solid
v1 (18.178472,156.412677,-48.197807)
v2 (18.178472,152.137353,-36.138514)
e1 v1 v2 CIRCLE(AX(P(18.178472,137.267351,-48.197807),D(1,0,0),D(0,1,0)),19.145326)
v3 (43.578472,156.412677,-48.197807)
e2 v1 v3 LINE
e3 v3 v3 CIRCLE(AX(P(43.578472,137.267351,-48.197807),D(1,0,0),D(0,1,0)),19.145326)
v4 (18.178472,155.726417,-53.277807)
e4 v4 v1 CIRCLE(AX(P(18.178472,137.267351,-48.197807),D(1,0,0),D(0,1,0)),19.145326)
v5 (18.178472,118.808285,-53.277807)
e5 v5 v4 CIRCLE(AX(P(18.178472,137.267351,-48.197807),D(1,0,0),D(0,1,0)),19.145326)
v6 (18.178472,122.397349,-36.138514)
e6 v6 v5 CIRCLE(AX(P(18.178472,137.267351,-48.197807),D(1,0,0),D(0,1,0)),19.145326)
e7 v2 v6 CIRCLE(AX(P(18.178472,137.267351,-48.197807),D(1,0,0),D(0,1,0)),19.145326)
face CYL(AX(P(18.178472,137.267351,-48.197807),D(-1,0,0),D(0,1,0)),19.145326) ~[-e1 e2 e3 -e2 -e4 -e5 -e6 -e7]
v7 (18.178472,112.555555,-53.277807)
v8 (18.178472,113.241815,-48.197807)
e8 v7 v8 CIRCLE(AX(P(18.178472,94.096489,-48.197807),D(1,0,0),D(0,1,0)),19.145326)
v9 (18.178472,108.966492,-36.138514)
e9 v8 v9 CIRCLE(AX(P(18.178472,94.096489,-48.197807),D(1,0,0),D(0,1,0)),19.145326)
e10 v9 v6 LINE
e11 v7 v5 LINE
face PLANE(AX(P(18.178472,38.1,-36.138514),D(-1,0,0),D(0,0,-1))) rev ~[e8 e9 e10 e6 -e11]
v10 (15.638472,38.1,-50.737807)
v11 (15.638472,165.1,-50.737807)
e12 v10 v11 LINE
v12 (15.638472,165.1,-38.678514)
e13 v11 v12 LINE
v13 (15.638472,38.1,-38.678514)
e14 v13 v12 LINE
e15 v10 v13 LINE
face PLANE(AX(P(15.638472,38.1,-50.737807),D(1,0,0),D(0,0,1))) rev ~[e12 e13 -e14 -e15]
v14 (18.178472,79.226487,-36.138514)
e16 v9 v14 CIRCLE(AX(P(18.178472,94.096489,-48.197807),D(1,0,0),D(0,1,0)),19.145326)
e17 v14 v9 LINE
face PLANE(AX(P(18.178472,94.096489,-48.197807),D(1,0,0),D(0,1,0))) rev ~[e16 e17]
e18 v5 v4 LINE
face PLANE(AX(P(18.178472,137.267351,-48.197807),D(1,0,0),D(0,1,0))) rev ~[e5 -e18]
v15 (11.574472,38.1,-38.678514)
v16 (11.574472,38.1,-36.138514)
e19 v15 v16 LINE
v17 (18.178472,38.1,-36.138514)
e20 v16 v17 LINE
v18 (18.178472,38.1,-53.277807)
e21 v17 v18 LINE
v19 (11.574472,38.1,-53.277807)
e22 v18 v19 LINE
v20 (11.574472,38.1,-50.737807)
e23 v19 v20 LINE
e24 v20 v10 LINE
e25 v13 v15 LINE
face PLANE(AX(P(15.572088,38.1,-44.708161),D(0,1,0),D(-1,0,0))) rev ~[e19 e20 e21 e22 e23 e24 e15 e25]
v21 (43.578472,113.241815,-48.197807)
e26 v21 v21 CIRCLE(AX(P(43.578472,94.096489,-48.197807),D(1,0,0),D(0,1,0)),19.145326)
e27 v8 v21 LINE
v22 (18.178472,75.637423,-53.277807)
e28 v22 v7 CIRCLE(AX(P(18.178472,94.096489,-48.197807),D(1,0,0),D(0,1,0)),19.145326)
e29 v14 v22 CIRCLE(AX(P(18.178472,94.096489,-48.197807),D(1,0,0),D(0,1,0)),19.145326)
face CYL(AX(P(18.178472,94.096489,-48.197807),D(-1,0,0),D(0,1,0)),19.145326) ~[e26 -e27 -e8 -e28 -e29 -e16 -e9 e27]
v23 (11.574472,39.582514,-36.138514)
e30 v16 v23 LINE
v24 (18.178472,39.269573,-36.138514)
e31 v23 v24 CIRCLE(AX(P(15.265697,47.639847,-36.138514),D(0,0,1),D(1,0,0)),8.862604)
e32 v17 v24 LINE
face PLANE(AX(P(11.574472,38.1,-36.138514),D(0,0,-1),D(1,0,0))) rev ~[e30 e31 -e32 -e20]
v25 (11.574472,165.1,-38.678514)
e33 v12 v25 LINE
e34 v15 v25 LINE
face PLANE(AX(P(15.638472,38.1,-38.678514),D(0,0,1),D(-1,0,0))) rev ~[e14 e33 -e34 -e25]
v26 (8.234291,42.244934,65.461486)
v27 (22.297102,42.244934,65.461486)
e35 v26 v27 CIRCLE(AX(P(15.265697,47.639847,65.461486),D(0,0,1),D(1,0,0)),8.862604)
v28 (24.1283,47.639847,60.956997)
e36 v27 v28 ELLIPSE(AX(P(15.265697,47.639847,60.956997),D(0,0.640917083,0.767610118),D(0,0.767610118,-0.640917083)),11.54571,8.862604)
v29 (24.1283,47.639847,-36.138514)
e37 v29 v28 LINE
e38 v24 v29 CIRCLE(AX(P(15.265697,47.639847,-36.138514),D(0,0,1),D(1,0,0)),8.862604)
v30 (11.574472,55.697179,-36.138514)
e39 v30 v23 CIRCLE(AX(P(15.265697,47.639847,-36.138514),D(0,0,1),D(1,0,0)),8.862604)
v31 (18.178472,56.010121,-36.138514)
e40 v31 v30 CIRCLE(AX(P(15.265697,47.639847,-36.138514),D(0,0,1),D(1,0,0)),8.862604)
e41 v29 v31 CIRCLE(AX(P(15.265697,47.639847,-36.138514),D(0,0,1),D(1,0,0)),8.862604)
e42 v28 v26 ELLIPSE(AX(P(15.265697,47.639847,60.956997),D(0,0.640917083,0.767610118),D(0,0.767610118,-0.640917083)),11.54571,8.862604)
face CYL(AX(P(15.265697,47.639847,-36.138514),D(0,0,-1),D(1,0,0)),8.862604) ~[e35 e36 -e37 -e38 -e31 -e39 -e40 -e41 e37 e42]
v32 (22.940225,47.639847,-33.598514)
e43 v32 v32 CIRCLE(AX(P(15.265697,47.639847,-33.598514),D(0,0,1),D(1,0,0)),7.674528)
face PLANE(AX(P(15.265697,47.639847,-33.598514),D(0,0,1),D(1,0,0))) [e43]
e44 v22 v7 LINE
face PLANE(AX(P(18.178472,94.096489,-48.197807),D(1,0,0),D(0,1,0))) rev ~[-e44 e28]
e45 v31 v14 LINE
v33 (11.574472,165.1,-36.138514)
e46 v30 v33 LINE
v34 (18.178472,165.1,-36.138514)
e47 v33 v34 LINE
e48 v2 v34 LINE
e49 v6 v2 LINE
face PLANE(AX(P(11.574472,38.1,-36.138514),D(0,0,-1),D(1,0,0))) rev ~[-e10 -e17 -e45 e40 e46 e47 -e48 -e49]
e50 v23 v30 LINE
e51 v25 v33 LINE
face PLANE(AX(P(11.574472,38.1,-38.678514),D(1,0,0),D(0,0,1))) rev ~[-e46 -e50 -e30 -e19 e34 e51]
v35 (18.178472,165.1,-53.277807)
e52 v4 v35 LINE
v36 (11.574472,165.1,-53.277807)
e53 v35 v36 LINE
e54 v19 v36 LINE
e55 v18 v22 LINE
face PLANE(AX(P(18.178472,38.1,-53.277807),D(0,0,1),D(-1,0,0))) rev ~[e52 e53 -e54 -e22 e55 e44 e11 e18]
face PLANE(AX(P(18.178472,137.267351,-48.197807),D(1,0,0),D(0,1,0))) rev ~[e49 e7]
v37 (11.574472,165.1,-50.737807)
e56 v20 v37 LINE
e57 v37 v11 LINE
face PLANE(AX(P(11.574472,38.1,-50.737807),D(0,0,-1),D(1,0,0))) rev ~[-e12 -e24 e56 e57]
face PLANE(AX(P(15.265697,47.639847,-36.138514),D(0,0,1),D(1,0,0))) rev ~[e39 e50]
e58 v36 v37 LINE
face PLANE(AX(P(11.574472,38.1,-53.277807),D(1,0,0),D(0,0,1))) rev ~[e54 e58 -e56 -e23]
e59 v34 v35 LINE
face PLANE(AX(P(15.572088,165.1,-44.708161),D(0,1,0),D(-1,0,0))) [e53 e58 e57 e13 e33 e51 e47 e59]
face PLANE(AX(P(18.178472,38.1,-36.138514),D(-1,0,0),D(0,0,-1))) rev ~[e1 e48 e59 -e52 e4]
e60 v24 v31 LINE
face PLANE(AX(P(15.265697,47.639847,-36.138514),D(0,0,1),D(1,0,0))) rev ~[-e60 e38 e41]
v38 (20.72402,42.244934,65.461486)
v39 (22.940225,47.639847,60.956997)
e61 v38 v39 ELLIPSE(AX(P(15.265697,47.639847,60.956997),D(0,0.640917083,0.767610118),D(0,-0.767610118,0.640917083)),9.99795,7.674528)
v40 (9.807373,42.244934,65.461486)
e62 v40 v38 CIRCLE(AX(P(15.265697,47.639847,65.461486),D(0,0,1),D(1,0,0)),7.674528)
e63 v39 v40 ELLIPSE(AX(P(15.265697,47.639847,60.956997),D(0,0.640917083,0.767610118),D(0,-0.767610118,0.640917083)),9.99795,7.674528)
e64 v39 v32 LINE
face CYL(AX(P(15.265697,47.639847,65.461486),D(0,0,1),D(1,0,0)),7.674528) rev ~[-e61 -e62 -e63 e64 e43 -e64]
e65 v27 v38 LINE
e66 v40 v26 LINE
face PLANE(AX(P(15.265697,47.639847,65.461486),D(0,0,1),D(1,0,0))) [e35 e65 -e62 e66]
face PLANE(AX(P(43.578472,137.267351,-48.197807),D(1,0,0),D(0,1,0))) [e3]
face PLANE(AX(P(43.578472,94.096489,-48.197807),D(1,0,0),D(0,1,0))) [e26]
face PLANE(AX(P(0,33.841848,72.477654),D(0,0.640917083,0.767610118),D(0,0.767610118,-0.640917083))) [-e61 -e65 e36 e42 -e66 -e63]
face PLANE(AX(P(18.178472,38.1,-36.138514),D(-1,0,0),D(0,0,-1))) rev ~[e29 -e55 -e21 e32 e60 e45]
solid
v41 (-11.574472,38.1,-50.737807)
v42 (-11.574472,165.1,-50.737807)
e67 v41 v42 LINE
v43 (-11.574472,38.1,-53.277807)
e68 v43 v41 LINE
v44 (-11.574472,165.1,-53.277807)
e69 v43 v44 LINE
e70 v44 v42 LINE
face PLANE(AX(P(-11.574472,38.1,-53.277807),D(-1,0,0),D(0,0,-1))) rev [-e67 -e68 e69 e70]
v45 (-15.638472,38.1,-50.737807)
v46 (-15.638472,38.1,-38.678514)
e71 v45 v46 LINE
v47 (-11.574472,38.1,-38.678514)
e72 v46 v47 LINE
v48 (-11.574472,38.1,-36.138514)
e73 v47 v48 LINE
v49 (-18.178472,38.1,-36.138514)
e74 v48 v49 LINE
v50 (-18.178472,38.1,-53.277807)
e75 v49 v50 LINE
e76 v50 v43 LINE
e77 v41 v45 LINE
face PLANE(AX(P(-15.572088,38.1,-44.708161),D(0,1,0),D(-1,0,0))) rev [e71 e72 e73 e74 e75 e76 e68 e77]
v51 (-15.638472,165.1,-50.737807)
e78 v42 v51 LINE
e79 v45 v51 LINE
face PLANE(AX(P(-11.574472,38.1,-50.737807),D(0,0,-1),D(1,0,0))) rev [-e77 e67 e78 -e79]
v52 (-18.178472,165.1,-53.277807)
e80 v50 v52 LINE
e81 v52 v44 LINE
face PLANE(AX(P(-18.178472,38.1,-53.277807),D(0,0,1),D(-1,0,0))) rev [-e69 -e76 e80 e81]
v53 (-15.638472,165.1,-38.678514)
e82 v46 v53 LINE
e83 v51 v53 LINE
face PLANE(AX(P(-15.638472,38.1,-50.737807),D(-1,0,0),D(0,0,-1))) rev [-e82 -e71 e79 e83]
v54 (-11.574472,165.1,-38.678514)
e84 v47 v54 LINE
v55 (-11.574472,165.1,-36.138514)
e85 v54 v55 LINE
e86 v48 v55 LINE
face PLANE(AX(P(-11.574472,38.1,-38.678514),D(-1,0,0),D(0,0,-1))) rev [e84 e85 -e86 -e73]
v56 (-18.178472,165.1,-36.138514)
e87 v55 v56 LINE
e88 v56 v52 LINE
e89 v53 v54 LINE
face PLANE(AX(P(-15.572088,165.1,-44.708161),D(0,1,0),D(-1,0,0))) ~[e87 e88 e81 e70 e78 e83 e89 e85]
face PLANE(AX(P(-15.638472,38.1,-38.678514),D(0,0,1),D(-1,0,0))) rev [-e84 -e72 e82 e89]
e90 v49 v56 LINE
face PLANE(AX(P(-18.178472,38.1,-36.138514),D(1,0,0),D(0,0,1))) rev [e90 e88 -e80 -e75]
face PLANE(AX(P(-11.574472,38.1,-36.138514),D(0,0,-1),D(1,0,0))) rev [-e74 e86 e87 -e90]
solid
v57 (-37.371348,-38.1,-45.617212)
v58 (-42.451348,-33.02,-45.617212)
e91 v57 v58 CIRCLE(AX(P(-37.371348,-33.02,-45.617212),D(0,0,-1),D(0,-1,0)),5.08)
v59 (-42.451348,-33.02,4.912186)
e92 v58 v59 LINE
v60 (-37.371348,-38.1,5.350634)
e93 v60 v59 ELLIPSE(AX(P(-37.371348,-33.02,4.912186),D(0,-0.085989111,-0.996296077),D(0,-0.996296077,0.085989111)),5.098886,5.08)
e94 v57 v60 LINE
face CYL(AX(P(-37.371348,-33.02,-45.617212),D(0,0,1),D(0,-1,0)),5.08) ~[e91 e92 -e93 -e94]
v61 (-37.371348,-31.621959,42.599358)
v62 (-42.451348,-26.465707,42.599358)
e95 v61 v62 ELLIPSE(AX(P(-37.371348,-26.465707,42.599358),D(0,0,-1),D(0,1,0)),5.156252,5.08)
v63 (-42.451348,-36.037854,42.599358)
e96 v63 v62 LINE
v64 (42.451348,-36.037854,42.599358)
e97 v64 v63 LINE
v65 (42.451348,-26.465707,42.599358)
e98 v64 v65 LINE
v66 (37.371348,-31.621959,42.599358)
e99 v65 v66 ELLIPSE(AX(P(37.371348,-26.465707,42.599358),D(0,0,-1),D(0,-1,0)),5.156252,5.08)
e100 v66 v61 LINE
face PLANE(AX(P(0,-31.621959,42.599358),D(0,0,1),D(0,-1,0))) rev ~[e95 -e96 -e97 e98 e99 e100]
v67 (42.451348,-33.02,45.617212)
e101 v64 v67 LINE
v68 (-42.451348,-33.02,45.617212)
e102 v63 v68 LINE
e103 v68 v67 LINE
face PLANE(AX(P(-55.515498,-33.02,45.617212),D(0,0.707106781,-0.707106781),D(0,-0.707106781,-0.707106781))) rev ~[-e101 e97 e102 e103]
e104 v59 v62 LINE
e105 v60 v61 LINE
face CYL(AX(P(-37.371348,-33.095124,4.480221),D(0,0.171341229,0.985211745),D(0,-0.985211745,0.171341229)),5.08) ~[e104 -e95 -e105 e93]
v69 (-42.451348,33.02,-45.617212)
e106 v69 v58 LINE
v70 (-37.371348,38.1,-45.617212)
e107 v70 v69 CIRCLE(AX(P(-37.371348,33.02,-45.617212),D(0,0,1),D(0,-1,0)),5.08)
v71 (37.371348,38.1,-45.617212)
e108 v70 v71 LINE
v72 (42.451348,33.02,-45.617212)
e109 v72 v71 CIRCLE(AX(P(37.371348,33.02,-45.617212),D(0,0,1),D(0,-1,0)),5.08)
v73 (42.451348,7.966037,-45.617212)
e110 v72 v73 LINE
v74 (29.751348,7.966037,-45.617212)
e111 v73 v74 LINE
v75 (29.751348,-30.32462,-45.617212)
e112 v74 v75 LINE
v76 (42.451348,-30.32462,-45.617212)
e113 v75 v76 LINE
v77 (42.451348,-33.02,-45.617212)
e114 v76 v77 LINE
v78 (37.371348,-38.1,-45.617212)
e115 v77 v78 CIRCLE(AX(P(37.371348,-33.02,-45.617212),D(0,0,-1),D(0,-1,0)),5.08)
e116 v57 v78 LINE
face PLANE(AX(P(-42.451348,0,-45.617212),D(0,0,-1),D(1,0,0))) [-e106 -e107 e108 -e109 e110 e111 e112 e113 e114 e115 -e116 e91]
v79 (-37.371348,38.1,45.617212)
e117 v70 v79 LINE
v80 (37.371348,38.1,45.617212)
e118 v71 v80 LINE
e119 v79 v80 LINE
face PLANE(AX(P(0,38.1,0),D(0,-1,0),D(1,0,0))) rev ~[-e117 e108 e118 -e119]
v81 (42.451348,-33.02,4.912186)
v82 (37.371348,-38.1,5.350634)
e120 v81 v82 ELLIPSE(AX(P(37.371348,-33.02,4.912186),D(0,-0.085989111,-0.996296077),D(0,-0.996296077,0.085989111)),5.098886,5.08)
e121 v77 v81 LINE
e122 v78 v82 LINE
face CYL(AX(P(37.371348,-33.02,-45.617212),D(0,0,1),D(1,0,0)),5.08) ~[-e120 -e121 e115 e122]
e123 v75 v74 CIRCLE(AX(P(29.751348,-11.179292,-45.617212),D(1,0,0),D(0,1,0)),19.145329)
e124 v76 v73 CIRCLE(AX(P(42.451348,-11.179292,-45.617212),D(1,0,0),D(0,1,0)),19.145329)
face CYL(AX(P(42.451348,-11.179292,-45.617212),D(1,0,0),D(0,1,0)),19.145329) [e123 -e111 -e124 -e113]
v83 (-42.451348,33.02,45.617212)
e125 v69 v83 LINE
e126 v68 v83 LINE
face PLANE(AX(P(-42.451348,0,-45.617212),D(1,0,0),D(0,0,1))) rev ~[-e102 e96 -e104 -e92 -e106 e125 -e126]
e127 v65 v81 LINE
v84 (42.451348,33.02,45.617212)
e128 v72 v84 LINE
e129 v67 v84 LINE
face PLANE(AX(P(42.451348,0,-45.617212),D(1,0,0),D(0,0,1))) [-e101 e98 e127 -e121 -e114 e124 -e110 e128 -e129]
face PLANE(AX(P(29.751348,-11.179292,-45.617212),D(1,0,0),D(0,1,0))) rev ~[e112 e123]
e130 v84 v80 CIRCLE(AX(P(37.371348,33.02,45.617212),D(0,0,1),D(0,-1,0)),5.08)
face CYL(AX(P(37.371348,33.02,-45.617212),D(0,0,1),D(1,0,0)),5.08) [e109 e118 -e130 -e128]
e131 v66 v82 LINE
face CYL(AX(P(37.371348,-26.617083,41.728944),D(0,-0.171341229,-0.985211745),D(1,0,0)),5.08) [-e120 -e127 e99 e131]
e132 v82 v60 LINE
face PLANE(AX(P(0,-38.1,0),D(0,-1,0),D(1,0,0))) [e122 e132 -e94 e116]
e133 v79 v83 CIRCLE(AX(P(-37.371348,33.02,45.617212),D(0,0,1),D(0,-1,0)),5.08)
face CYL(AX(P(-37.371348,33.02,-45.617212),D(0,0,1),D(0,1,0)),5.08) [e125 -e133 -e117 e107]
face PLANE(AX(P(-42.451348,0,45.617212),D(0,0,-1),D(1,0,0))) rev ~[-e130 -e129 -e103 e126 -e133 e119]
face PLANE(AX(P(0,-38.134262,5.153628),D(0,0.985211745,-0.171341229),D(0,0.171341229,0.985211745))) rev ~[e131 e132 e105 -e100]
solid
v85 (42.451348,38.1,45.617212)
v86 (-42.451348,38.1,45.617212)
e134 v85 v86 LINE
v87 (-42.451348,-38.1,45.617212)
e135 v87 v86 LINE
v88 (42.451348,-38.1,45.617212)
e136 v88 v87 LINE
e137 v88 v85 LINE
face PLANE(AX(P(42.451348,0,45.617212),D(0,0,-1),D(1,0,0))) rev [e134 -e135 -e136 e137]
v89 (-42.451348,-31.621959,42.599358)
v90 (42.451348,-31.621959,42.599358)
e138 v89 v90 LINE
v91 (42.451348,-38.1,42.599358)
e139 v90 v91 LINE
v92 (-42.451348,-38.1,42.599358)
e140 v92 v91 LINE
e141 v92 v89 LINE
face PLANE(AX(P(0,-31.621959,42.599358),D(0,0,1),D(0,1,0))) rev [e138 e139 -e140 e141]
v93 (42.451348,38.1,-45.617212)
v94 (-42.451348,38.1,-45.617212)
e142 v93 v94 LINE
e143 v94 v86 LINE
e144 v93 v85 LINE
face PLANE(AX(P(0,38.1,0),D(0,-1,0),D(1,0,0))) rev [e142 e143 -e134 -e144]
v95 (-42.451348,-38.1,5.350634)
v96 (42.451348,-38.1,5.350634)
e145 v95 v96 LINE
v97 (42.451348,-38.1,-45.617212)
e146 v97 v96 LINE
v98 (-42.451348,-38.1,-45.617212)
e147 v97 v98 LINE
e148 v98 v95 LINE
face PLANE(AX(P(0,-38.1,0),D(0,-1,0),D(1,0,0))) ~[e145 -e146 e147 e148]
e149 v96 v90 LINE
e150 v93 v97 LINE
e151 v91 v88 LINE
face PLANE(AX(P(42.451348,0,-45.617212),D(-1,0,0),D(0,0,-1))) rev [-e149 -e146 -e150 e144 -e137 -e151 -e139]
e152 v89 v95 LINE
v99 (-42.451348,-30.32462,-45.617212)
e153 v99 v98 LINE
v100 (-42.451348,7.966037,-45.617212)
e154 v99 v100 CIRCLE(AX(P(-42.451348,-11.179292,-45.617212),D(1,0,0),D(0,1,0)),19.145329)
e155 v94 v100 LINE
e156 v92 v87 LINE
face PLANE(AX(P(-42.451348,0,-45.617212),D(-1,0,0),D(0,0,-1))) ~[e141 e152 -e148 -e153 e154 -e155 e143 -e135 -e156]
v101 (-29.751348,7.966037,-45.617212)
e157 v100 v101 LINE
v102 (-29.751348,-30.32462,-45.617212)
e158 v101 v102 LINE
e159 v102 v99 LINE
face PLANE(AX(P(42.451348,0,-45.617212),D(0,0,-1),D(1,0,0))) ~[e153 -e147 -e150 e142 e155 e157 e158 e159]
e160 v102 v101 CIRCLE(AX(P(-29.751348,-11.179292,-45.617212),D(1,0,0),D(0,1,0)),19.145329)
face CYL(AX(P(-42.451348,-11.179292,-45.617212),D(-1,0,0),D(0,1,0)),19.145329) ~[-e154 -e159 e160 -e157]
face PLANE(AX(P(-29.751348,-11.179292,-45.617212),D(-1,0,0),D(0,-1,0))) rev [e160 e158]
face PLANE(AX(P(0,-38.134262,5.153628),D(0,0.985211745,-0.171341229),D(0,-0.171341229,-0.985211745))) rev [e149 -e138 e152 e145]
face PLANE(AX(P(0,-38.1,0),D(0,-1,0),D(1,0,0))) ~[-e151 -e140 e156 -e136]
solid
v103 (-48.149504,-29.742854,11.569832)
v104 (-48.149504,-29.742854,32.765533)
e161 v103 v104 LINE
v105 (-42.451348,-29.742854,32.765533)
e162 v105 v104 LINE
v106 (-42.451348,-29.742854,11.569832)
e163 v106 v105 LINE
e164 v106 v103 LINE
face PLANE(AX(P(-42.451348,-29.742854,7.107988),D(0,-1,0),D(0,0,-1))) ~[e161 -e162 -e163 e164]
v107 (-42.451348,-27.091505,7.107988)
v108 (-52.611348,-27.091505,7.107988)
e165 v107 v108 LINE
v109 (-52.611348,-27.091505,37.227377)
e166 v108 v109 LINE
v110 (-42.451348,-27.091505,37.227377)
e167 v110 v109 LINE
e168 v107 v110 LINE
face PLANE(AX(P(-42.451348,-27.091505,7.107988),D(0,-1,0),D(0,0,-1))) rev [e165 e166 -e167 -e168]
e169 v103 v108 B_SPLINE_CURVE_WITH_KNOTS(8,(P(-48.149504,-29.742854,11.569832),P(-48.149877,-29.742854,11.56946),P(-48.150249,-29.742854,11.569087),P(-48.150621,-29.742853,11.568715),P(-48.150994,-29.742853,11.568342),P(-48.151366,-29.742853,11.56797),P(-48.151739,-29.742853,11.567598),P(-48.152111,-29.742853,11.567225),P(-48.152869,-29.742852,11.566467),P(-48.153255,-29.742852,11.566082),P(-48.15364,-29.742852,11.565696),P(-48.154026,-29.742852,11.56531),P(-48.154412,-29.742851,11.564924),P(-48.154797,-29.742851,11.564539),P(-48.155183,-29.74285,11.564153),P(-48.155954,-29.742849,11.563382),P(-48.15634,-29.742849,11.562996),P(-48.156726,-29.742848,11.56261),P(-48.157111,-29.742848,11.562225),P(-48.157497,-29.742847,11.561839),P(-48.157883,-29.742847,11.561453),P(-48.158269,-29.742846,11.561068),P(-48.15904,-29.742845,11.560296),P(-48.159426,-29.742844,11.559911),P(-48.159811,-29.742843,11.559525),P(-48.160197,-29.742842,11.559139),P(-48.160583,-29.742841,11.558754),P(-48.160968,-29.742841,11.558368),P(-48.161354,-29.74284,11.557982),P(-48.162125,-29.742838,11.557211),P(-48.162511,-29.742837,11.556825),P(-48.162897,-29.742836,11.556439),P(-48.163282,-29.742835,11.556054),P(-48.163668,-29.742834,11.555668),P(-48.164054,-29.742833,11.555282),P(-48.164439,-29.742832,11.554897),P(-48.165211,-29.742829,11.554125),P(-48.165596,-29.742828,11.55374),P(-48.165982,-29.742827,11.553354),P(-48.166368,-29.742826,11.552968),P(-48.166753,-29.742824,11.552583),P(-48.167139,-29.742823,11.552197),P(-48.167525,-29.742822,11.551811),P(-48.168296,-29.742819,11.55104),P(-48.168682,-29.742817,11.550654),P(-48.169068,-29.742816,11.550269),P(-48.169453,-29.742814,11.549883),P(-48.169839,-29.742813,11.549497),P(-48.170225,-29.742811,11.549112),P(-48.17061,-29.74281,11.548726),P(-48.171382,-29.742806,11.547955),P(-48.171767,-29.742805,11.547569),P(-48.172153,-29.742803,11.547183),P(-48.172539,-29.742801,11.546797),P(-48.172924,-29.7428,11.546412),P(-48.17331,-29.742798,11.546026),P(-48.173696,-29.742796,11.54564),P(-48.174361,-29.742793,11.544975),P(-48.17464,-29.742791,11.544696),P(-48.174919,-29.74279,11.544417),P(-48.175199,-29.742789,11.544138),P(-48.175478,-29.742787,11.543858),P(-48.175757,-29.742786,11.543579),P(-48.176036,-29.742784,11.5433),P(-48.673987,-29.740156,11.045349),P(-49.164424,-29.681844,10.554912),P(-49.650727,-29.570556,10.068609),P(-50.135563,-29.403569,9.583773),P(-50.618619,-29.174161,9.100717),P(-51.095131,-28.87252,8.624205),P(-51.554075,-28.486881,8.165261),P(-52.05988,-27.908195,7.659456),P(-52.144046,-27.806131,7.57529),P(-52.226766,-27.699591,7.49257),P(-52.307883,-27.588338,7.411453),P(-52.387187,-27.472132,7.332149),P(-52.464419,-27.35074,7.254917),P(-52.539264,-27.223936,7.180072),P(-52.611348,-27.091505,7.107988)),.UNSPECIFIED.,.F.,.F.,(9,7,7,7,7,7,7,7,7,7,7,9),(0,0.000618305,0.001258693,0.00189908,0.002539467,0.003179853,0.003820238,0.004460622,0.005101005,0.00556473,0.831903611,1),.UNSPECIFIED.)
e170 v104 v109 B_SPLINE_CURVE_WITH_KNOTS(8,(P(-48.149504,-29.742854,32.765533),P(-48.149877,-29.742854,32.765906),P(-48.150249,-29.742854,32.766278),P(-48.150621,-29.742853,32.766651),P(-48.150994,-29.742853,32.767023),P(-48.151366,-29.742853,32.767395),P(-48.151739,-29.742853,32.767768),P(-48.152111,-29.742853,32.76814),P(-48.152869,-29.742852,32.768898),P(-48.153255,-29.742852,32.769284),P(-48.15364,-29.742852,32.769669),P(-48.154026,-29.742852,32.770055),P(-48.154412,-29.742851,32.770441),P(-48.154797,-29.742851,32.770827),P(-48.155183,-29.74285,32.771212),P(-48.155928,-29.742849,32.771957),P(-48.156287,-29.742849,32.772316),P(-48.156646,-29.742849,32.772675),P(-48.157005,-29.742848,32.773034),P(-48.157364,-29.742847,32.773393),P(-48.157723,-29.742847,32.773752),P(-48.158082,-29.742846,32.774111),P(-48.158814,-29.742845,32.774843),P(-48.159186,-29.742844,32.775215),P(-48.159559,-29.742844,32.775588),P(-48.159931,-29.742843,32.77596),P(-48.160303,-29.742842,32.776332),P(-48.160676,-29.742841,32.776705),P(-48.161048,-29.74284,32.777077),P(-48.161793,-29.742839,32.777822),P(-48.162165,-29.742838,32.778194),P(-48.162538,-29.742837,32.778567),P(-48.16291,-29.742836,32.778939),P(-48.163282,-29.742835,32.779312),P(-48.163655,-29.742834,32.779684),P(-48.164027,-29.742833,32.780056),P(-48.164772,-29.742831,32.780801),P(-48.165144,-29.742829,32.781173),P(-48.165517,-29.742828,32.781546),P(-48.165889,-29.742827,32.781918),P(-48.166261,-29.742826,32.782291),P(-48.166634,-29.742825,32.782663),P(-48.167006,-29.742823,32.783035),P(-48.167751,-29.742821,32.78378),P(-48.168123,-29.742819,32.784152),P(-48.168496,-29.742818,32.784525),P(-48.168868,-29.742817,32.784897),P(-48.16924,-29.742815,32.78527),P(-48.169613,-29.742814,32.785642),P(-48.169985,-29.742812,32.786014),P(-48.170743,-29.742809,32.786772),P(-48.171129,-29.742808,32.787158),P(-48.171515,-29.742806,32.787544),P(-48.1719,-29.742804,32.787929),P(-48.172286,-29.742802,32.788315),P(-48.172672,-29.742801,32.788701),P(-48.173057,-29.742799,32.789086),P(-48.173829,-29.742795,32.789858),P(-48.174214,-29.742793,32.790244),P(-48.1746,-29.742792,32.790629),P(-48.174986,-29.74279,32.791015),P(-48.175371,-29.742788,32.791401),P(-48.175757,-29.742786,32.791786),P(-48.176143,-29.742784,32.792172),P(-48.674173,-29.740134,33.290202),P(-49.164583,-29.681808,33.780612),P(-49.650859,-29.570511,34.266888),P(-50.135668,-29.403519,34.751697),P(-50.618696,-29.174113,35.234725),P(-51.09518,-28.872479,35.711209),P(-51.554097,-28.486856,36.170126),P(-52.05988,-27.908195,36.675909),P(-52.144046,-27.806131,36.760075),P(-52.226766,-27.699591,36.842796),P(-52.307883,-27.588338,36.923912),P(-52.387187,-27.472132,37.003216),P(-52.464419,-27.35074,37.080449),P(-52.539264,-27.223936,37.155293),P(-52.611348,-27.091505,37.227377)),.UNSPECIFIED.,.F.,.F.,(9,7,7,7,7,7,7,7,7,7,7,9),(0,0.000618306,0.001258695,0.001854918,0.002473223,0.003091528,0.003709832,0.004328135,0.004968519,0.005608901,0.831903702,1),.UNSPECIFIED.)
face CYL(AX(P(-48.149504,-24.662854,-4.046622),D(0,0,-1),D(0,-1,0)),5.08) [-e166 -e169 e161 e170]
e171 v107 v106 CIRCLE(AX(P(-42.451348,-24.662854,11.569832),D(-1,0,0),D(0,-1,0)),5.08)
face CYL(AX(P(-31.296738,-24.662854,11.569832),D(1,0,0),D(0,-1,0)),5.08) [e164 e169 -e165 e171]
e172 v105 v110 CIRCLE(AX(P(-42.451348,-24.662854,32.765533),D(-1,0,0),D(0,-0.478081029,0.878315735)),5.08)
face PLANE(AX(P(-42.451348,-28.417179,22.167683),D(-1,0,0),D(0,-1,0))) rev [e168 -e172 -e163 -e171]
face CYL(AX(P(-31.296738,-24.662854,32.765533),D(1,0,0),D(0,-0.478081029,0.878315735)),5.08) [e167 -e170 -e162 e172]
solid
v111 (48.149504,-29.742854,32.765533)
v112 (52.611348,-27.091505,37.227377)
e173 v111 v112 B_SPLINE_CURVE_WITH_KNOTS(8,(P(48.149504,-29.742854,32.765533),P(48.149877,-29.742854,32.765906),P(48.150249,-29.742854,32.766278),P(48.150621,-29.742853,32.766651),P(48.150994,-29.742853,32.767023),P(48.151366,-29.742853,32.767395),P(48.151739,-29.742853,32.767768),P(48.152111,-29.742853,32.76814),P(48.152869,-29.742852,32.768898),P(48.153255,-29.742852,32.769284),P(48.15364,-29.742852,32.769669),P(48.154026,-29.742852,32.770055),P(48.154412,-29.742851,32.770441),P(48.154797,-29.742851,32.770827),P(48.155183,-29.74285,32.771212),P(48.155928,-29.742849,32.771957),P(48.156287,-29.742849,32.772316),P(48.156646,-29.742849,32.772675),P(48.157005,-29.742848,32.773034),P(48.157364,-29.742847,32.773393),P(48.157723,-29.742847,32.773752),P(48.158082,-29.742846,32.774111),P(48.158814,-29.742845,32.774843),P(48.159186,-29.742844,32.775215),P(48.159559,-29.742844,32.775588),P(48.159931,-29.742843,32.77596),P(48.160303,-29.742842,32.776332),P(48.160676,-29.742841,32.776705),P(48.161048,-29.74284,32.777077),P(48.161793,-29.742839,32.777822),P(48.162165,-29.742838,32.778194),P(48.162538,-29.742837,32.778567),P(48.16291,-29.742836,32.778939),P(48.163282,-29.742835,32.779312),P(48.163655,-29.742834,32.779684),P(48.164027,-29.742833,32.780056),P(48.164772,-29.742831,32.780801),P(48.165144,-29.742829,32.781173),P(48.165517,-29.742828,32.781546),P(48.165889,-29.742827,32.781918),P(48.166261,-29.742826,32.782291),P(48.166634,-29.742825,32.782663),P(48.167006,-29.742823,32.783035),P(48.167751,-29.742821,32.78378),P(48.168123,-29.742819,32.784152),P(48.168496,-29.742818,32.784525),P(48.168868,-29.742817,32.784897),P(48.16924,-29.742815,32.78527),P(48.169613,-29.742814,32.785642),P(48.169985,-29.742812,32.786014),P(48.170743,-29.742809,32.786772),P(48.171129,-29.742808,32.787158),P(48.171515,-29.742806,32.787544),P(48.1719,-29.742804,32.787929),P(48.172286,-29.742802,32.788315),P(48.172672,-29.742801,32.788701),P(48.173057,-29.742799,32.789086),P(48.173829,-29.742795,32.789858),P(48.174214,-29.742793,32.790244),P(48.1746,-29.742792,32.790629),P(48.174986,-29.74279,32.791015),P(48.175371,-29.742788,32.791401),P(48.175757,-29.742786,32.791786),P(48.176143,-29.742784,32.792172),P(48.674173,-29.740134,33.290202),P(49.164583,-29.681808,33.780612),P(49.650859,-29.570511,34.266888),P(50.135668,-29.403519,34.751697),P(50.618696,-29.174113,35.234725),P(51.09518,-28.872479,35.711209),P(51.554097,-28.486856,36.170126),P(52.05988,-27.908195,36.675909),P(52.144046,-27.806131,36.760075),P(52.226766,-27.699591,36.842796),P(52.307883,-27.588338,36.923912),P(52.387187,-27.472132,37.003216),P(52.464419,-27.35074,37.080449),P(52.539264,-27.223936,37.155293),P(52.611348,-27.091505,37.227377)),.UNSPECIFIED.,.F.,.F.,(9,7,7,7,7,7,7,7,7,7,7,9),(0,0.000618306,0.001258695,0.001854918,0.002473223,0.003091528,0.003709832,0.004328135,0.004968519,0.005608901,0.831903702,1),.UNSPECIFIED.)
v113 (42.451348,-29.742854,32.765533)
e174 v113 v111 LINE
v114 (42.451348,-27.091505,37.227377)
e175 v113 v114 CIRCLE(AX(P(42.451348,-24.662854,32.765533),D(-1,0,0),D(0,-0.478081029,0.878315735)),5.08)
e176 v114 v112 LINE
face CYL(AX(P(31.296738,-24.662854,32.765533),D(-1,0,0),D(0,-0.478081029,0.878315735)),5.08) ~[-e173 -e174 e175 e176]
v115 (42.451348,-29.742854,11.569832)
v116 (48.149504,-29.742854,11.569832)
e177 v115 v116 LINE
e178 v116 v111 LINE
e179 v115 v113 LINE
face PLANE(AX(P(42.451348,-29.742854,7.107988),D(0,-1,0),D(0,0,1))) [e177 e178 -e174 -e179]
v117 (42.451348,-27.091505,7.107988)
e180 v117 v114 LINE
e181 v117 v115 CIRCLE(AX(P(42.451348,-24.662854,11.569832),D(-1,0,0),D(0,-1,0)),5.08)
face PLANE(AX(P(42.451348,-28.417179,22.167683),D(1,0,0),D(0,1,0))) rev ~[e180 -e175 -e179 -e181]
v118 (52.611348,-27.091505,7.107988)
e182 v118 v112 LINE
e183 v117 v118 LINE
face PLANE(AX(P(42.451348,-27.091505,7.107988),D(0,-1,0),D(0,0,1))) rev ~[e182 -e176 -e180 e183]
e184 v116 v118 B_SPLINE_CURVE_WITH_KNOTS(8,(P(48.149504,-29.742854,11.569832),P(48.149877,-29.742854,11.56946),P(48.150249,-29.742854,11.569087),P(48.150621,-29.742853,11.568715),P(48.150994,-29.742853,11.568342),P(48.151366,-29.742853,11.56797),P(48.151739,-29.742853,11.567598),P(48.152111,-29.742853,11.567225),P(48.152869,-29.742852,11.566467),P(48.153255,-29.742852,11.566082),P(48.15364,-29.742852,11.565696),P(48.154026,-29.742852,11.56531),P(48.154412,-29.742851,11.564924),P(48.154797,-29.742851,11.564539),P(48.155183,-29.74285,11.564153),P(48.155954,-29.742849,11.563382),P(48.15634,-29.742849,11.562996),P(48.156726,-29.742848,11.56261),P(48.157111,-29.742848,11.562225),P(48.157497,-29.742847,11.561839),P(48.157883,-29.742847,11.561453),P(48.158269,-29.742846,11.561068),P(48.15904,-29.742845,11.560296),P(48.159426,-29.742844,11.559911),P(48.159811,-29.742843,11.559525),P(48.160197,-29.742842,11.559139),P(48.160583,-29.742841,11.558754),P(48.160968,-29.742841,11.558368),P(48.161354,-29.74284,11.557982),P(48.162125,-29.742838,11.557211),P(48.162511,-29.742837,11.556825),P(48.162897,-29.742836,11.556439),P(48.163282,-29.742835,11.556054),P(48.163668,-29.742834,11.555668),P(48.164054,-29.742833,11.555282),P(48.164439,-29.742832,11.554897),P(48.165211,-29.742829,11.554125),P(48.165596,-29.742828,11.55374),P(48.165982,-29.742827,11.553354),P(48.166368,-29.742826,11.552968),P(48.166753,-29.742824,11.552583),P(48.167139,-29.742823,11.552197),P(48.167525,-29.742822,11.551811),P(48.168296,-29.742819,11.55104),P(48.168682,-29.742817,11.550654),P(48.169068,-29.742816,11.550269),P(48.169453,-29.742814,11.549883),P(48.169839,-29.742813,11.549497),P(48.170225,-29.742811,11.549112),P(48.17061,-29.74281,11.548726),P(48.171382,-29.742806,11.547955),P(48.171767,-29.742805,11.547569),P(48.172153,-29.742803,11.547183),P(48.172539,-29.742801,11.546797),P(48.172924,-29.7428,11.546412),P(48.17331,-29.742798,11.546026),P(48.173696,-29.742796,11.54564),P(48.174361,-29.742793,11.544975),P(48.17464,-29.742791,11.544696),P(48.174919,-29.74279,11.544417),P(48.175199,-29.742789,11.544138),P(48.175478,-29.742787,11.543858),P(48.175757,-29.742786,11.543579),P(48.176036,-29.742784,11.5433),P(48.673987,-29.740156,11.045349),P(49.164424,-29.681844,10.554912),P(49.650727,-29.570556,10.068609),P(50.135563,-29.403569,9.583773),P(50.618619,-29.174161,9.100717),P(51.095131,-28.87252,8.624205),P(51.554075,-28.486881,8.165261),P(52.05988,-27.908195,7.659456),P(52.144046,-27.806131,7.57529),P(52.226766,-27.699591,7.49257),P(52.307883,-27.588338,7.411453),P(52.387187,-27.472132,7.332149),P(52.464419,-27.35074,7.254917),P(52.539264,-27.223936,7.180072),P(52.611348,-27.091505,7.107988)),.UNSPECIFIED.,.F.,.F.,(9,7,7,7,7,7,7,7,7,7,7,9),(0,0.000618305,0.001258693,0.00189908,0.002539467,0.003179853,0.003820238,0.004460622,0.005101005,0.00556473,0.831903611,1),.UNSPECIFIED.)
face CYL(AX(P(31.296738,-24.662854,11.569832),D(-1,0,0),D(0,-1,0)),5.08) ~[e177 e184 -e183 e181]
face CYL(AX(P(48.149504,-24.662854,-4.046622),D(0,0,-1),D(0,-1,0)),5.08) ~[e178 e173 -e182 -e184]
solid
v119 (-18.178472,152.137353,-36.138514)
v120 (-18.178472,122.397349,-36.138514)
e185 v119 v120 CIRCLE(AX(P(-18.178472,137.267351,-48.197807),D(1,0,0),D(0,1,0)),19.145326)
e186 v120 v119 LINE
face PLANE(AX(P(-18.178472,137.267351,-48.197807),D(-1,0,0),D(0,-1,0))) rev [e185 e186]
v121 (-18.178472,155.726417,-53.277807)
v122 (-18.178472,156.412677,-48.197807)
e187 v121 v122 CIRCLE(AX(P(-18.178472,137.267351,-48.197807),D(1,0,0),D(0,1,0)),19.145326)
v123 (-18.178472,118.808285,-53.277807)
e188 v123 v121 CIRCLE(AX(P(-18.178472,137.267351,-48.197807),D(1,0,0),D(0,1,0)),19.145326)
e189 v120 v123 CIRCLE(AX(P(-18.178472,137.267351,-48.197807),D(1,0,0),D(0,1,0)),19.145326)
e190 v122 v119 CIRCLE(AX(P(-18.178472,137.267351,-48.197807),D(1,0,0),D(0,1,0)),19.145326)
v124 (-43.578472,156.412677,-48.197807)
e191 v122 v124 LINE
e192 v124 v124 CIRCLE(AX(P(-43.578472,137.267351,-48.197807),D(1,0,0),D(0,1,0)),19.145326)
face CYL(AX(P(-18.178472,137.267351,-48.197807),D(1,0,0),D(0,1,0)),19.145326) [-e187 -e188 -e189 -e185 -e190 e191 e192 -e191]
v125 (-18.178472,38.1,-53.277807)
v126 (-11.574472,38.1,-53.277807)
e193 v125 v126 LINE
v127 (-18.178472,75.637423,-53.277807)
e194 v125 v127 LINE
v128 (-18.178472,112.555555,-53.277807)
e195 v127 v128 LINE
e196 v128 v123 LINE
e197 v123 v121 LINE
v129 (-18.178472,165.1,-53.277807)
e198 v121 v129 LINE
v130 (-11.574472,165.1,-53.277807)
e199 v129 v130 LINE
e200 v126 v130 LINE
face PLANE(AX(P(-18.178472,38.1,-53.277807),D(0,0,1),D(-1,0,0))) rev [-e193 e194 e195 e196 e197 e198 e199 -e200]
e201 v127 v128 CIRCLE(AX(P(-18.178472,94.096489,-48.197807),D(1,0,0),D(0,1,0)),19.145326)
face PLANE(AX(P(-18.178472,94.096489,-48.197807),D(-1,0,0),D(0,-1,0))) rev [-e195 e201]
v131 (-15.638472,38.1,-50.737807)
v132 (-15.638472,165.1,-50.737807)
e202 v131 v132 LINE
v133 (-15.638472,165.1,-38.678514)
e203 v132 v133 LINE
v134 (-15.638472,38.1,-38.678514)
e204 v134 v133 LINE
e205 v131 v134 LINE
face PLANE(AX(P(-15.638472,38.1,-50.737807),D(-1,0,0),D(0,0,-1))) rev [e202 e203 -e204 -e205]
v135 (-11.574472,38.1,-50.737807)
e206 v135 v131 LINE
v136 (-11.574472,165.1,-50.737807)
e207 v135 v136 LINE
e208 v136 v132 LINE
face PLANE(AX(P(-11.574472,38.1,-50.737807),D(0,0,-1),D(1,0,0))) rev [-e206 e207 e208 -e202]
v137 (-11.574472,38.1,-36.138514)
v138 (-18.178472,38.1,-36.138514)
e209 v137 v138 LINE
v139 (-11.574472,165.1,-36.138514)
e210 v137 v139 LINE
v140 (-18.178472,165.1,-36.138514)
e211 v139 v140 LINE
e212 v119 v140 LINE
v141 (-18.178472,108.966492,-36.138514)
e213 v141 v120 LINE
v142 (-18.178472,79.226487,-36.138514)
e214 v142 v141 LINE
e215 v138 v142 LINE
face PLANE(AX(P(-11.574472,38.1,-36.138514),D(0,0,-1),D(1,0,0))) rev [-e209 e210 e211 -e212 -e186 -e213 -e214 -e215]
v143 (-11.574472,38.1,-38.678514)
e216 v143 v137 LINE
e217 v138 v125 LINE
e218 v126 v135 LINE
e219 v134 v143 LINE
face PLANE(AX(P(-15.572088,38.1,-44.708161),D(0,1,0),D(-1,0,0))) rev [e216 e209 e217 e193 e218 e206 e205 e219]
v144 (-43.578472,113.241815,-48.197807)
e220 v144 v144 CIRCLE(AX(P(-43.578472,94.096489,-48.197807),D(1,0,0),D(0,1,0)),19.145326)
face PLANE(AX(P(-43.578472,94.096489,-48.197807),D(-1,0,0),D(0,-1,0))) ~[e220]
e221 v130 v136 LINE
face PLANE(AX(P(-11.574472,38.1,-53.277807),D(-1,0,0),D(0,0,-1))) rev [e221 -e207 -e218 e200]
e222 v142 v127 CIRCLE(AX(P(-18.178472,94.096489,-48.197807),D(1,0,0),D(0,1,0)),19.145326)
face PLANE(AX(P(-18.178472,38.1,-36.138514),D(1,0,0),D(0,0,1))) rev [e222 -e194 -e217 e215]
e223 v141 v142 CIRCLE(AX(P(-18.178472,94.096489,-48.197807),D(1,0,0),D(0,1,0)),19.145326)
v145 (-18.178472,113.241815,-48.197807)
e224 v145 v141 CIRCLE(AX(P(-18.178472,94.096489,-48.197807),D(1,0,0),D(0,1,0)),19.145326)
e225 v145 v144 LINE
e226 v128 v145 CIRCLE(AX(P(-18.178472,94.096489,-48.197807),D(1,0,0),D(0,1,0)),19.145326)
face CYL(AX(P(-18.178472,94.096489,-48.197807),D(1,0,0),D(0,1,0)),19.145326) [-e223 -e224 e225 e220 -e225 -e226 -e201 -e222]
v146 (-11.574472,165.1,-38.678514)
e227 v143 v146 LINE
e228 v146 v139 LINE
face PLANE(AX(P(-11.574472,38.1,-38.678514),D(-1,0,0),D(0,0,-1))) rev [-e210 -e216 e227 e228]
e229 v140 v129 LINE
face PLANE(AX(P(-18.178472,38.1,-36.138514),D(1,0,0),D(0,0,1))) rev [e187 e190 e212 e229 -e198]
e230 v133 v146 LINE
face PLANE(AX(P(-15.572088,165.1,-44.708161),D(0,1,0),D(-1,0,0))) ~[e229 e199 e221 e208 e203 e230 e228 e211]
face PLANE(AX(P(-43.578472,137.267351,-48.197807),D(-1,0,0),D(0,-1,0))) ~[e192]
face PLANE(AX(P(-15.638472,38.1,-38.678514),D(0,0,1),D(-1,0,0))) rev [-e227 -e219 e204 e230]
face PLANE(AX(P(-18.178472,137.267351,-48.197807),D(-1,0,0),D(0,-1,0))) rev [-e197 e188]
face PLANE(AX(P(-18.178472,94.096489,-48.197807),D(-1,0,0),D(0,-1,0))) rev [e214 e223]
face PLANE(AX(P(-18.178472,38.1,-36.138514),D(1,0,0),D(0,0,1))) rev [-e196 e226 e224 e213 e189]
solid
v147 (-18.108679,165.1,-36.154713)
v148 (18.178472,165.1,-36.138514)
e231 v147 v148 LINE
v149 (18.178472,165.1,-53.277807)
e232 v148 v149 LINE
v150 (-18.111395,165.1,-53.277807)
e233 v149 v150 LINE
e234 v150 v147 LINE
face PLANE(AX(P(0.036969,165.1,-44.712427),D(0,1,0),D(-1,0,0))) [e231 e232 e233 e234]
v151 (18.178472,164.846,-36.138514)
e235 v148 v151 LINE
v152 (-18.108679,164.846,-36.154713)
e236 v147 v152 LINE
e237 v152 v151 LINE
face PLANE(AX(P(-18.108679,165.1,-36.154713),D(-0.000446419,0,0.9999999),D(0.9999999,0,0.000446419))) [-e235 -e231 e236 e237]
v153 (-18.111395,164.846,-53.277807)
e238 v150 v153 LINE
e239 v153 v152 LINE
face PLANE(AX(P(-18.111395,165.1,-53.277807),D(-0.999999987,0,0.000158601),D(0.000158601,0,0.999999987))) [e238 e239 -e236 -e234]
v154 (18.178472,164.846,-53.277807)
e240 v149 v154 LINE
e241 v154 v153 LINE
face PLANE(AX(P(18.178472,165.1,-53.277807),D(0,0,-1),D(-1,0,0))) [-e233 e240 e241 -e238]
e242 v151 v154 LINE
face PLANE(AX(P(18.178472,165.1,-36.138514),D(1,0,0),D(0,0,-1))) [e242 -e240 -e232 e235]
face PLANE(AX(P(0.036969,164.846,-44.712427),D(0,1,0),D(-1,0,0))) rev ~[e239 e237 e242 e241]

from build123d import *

# Parameters (mm, degrees)
F0_W          = 84.9026963115
F0_H          = 91.2344232202
F1_DEPTH      = 38.1
F3_DEPTH      = 42.4523481557
F3_DEPTH_BACK = 42.4523481557
F4_R          = 19.1453288311
F5_DEPTH      = 12.7
F8_DEPTH      = 127
F10_R         = 19.1453262
F11_DEPTH     = 25.4
F13_R         = 5.08
F14_T1_DEPTH  = 111.0309954692
F15_R         = 8.8626036941
F16_DEPTH     = 101.6
F17_R         = 7.6745278719
F18_DEPTH     = 99.06
F20_DEPTH     = 43.5794721032
F21_W         = 2.6513483719
F21_H         = 30.1193892955
F22_DEPTH     = 10.16
F23_T1_DEPTH  = 32.4692196578
F23_T3_DEPTH  = 52.4286089533
F26_DEPTH     = 0.254


# Not quite as in the source:
# - a fillet or chamfer that OpenCascade refuses, or shapes differently, is made with other operations: its cross-section is extruded or revolved along the edge and cut away or added


with BuildPart() as f1:
    # F0 (on Front) → F1 (new body, symmetric)
    with BuildSketch(Plane.XZ):
        Rectangle(F0_W, F0_H)
    extrude(amount=F1_DEPTH, both=True)

    # F2 (on Right) → F3 (cut, two sides)
    with BuildSketch(Plane.YZ) as f3_sk:
        Polygon((-38.9483012259, 42.5993576646), (-38.1342619658, 5.1536280662), (-31.6219590604, 42.5993576646), align=None)
    extrude(amount=-F3_DEPTH, mode=Mode.SUBTRACT)
    extrude(f3_sk.sketch, amount=F3_DEPTH_BACK, mode=Mode.SUBTRACT)

    # F4 (on face) → F5 (join)
    with BuildSketch(Plane.YZ.offset(42.4513481557)):
        with Locations((-11.1792916432, -45.6172116101)):
            Circle(F4_R)
    extrude(amount=-F5_DEPTH)


with BuildPart() as f6_1:
    # F6: instance of F1
    add(f1.part.mirror(Plane.YZ))


with BuildPart() as f8:
    # F7 (on face) → F8 (new body)
    with BuildSketch(Plane(origin=(0, 38.1, 0), x_dir=(-1, 0, 0), z_dir=(0, 1, 0))):
        Polygon((-18.1784721032, -53.2778071603), (-11.5744721032, -53.2778071603), (-11.5744721032, -50.7378071603), (-15.6384721032, -50.7378071603), (-15.6384721032, -38.6785142068), (-11.5744721032, -38.6785142068), (-11.5744721032, -36.1385142068), (-18.1784721032, -36.1385142068), align=None)
    extrude(amount=F8_DEPTH)


with BuildPart() as f9_1:
    # F9: instance of F8
    add(f8.part.mirror(Plane.YZ))


with BuildPart() as f8_1:
    add(f8.part)

    # F10 (on face) → F11 (join)
    with BuildSketch(Plane.YZ.offset(18.1784721032)):
        with Locations((137.2673511505, -48.1978071603)):
            Circle(F10_R)
        with Locations((94.0964892507, -48.1978071603)):
            Circle(F10_R)
    extrude(amount=F11_DEPTH)


with BuildPart() as f12_1:
    # F12: instance of F8
    add(f8_1.part.mirror(Plane.YZ))


with BuildPart() as f1_1:
    add(f1.part)

    # F13
    f13_edges = [f1_1.edges().sort_by_distance(p)[0] for p in [
        (42.451348, -38.1, -20.133289),
        (42.451348, -34.86098, 23.974996),
        (-42.451348, -38.1, -20.133289),
        (-42.451348, -34.86098, 23.974996),
        (42.451348, 38.1, 0),
        (-42.451348, 38.1, 0),
    ]]
    fillet(f13_edges, radius=F13_R)

    # F14: chamfer of 5.08 on 1 edges, made by hand

    # F14_s2 → F14_t1 (cut)
    with BuildSketch(Plane.YZ.offset(-55.5154977346)):
        Polygon((-33.02, 45.6172116101), (-38.1, 40.5372116101), (-38.1, 45.6172116101), align=None)
    extrude(amount=F14_T1_DEPTH, mode=Mode.SUBTRACT)


with BuildPart() as f8_2:
    add(f8_1.part)

    # F15 (on face) → F16 (join)
    with BuildSketch(Plane.XY.offset(-36.1385142068)):
        with Locations((15.265696682, 47.6398468018)):
            Circle(F15_R)
    extrude(amount=F16_DEPTH)

    # F17 (on face) → F18 (cut)
    with BuildSketch(Plane.XY.offset(65.4614857932)):
        with Locations((15.265696682, 47.6398468018)):
            Circle(F17_R)
    extrude(amount=-F18_DEPTH, mode=Mode.SUBTRACT)

    # F19 (on Right) → F20 (cut, through all)
    with BuildSketch(Plane.YZ):
        Polygon((58.7693750858, 70.7835555077), (33.8418483734, 72.4776536226), (58.7693750858, 51.6643822193), align=None)
    extrude(amount=F20_DEPTH, mode=Mode.SUBTRACT)


with BuildPart() as f22:
    # F21 (on face) → F22 (new body)
    with BuildSketch(Plane.YZ.offset(42.4513481557)):
        with Locations((-28.417179361, 22.1676826477)):
            Rectangle(F21_W, F21_H)
    extrude(amount=F22_DEPTH)

    # F23: fillet of radius 5.08 on 3 edges, made by hand

    # F23_s2 → F23_t1 (cut)
    with BuildSketch(Plane.YZ.offset(31.2967383268)):
        with BuildLine():
            ThreePointArc((-27.091505175, 37.2273772955), (-29.0300008006, 35.360610408), (-29.742853547, 32.7655333639))
            Line((-29.742853547, 32.7655333639), (-29.742853547, 37.2273772955))
            Line((-29.742853547, 37.2273772955), (-27.091505175, 37.2273772955))
        make_face()
        with BuildLine():
            ThreePointArc((-29.742853547, 11.5698319316), (-29.0300008006, 8.9747548875), (-27.091505175, 7.107988))
            Line((-27.091505175, 7.107988), (-29.742853547, 7.107988))
            Line((-29.742853547, 7.107988), (-29.742853547, 11.5698319316))
        make_face()
    extrude(amount=F23_T1_DEPTH, mode=Mode.SUBTRACT)

    # F23_s4 → F23_t3 (cut)
    with BuildSketch(Plane.XY.offset(-4.0466218289)):
        with BuildLine():
            ThreePointArc((48.1495042242, -29.742853547), (50.7445812683, -29.0300008006), (52.6113481557, -27.091505175))
            Line((52.6113481557, -27.091505175), (52.6113481557, -29.742853547))
            Line((52.6113481557, -29.742853547), (48.1495042242, -29.742853547))
        make_face()
    extrude(amount=F23_T3_DEPTH, mode=Mode.SUBTRACT)


with BuildPart() as f24_1:
    # F24: instance of F22
    add(f22.part.mirror(Plane.YZ))


with BuildPart() as f26:
    # F25 (on face) → F26 (new body)
    with BuildSketch(Plane(origin=(0, 165.1, 0), x_dir=(-1, 0, 0), z_dir=(0, 1, 0))):
        Polygon((18.1113947183, -53.2778071603), (18.1086789817, -36.1547134817), (-18.1784721032, -36.1385142068), (-18.1784721032, -53.2778071603), align=None)
    extrude(amount=-F26_DEPTH)


solid = Compound([f6_1.part, f9_1.part, f12_1.part, f1_1.part, f8_2.part, f22.part, f24_1.part, f26.part])
